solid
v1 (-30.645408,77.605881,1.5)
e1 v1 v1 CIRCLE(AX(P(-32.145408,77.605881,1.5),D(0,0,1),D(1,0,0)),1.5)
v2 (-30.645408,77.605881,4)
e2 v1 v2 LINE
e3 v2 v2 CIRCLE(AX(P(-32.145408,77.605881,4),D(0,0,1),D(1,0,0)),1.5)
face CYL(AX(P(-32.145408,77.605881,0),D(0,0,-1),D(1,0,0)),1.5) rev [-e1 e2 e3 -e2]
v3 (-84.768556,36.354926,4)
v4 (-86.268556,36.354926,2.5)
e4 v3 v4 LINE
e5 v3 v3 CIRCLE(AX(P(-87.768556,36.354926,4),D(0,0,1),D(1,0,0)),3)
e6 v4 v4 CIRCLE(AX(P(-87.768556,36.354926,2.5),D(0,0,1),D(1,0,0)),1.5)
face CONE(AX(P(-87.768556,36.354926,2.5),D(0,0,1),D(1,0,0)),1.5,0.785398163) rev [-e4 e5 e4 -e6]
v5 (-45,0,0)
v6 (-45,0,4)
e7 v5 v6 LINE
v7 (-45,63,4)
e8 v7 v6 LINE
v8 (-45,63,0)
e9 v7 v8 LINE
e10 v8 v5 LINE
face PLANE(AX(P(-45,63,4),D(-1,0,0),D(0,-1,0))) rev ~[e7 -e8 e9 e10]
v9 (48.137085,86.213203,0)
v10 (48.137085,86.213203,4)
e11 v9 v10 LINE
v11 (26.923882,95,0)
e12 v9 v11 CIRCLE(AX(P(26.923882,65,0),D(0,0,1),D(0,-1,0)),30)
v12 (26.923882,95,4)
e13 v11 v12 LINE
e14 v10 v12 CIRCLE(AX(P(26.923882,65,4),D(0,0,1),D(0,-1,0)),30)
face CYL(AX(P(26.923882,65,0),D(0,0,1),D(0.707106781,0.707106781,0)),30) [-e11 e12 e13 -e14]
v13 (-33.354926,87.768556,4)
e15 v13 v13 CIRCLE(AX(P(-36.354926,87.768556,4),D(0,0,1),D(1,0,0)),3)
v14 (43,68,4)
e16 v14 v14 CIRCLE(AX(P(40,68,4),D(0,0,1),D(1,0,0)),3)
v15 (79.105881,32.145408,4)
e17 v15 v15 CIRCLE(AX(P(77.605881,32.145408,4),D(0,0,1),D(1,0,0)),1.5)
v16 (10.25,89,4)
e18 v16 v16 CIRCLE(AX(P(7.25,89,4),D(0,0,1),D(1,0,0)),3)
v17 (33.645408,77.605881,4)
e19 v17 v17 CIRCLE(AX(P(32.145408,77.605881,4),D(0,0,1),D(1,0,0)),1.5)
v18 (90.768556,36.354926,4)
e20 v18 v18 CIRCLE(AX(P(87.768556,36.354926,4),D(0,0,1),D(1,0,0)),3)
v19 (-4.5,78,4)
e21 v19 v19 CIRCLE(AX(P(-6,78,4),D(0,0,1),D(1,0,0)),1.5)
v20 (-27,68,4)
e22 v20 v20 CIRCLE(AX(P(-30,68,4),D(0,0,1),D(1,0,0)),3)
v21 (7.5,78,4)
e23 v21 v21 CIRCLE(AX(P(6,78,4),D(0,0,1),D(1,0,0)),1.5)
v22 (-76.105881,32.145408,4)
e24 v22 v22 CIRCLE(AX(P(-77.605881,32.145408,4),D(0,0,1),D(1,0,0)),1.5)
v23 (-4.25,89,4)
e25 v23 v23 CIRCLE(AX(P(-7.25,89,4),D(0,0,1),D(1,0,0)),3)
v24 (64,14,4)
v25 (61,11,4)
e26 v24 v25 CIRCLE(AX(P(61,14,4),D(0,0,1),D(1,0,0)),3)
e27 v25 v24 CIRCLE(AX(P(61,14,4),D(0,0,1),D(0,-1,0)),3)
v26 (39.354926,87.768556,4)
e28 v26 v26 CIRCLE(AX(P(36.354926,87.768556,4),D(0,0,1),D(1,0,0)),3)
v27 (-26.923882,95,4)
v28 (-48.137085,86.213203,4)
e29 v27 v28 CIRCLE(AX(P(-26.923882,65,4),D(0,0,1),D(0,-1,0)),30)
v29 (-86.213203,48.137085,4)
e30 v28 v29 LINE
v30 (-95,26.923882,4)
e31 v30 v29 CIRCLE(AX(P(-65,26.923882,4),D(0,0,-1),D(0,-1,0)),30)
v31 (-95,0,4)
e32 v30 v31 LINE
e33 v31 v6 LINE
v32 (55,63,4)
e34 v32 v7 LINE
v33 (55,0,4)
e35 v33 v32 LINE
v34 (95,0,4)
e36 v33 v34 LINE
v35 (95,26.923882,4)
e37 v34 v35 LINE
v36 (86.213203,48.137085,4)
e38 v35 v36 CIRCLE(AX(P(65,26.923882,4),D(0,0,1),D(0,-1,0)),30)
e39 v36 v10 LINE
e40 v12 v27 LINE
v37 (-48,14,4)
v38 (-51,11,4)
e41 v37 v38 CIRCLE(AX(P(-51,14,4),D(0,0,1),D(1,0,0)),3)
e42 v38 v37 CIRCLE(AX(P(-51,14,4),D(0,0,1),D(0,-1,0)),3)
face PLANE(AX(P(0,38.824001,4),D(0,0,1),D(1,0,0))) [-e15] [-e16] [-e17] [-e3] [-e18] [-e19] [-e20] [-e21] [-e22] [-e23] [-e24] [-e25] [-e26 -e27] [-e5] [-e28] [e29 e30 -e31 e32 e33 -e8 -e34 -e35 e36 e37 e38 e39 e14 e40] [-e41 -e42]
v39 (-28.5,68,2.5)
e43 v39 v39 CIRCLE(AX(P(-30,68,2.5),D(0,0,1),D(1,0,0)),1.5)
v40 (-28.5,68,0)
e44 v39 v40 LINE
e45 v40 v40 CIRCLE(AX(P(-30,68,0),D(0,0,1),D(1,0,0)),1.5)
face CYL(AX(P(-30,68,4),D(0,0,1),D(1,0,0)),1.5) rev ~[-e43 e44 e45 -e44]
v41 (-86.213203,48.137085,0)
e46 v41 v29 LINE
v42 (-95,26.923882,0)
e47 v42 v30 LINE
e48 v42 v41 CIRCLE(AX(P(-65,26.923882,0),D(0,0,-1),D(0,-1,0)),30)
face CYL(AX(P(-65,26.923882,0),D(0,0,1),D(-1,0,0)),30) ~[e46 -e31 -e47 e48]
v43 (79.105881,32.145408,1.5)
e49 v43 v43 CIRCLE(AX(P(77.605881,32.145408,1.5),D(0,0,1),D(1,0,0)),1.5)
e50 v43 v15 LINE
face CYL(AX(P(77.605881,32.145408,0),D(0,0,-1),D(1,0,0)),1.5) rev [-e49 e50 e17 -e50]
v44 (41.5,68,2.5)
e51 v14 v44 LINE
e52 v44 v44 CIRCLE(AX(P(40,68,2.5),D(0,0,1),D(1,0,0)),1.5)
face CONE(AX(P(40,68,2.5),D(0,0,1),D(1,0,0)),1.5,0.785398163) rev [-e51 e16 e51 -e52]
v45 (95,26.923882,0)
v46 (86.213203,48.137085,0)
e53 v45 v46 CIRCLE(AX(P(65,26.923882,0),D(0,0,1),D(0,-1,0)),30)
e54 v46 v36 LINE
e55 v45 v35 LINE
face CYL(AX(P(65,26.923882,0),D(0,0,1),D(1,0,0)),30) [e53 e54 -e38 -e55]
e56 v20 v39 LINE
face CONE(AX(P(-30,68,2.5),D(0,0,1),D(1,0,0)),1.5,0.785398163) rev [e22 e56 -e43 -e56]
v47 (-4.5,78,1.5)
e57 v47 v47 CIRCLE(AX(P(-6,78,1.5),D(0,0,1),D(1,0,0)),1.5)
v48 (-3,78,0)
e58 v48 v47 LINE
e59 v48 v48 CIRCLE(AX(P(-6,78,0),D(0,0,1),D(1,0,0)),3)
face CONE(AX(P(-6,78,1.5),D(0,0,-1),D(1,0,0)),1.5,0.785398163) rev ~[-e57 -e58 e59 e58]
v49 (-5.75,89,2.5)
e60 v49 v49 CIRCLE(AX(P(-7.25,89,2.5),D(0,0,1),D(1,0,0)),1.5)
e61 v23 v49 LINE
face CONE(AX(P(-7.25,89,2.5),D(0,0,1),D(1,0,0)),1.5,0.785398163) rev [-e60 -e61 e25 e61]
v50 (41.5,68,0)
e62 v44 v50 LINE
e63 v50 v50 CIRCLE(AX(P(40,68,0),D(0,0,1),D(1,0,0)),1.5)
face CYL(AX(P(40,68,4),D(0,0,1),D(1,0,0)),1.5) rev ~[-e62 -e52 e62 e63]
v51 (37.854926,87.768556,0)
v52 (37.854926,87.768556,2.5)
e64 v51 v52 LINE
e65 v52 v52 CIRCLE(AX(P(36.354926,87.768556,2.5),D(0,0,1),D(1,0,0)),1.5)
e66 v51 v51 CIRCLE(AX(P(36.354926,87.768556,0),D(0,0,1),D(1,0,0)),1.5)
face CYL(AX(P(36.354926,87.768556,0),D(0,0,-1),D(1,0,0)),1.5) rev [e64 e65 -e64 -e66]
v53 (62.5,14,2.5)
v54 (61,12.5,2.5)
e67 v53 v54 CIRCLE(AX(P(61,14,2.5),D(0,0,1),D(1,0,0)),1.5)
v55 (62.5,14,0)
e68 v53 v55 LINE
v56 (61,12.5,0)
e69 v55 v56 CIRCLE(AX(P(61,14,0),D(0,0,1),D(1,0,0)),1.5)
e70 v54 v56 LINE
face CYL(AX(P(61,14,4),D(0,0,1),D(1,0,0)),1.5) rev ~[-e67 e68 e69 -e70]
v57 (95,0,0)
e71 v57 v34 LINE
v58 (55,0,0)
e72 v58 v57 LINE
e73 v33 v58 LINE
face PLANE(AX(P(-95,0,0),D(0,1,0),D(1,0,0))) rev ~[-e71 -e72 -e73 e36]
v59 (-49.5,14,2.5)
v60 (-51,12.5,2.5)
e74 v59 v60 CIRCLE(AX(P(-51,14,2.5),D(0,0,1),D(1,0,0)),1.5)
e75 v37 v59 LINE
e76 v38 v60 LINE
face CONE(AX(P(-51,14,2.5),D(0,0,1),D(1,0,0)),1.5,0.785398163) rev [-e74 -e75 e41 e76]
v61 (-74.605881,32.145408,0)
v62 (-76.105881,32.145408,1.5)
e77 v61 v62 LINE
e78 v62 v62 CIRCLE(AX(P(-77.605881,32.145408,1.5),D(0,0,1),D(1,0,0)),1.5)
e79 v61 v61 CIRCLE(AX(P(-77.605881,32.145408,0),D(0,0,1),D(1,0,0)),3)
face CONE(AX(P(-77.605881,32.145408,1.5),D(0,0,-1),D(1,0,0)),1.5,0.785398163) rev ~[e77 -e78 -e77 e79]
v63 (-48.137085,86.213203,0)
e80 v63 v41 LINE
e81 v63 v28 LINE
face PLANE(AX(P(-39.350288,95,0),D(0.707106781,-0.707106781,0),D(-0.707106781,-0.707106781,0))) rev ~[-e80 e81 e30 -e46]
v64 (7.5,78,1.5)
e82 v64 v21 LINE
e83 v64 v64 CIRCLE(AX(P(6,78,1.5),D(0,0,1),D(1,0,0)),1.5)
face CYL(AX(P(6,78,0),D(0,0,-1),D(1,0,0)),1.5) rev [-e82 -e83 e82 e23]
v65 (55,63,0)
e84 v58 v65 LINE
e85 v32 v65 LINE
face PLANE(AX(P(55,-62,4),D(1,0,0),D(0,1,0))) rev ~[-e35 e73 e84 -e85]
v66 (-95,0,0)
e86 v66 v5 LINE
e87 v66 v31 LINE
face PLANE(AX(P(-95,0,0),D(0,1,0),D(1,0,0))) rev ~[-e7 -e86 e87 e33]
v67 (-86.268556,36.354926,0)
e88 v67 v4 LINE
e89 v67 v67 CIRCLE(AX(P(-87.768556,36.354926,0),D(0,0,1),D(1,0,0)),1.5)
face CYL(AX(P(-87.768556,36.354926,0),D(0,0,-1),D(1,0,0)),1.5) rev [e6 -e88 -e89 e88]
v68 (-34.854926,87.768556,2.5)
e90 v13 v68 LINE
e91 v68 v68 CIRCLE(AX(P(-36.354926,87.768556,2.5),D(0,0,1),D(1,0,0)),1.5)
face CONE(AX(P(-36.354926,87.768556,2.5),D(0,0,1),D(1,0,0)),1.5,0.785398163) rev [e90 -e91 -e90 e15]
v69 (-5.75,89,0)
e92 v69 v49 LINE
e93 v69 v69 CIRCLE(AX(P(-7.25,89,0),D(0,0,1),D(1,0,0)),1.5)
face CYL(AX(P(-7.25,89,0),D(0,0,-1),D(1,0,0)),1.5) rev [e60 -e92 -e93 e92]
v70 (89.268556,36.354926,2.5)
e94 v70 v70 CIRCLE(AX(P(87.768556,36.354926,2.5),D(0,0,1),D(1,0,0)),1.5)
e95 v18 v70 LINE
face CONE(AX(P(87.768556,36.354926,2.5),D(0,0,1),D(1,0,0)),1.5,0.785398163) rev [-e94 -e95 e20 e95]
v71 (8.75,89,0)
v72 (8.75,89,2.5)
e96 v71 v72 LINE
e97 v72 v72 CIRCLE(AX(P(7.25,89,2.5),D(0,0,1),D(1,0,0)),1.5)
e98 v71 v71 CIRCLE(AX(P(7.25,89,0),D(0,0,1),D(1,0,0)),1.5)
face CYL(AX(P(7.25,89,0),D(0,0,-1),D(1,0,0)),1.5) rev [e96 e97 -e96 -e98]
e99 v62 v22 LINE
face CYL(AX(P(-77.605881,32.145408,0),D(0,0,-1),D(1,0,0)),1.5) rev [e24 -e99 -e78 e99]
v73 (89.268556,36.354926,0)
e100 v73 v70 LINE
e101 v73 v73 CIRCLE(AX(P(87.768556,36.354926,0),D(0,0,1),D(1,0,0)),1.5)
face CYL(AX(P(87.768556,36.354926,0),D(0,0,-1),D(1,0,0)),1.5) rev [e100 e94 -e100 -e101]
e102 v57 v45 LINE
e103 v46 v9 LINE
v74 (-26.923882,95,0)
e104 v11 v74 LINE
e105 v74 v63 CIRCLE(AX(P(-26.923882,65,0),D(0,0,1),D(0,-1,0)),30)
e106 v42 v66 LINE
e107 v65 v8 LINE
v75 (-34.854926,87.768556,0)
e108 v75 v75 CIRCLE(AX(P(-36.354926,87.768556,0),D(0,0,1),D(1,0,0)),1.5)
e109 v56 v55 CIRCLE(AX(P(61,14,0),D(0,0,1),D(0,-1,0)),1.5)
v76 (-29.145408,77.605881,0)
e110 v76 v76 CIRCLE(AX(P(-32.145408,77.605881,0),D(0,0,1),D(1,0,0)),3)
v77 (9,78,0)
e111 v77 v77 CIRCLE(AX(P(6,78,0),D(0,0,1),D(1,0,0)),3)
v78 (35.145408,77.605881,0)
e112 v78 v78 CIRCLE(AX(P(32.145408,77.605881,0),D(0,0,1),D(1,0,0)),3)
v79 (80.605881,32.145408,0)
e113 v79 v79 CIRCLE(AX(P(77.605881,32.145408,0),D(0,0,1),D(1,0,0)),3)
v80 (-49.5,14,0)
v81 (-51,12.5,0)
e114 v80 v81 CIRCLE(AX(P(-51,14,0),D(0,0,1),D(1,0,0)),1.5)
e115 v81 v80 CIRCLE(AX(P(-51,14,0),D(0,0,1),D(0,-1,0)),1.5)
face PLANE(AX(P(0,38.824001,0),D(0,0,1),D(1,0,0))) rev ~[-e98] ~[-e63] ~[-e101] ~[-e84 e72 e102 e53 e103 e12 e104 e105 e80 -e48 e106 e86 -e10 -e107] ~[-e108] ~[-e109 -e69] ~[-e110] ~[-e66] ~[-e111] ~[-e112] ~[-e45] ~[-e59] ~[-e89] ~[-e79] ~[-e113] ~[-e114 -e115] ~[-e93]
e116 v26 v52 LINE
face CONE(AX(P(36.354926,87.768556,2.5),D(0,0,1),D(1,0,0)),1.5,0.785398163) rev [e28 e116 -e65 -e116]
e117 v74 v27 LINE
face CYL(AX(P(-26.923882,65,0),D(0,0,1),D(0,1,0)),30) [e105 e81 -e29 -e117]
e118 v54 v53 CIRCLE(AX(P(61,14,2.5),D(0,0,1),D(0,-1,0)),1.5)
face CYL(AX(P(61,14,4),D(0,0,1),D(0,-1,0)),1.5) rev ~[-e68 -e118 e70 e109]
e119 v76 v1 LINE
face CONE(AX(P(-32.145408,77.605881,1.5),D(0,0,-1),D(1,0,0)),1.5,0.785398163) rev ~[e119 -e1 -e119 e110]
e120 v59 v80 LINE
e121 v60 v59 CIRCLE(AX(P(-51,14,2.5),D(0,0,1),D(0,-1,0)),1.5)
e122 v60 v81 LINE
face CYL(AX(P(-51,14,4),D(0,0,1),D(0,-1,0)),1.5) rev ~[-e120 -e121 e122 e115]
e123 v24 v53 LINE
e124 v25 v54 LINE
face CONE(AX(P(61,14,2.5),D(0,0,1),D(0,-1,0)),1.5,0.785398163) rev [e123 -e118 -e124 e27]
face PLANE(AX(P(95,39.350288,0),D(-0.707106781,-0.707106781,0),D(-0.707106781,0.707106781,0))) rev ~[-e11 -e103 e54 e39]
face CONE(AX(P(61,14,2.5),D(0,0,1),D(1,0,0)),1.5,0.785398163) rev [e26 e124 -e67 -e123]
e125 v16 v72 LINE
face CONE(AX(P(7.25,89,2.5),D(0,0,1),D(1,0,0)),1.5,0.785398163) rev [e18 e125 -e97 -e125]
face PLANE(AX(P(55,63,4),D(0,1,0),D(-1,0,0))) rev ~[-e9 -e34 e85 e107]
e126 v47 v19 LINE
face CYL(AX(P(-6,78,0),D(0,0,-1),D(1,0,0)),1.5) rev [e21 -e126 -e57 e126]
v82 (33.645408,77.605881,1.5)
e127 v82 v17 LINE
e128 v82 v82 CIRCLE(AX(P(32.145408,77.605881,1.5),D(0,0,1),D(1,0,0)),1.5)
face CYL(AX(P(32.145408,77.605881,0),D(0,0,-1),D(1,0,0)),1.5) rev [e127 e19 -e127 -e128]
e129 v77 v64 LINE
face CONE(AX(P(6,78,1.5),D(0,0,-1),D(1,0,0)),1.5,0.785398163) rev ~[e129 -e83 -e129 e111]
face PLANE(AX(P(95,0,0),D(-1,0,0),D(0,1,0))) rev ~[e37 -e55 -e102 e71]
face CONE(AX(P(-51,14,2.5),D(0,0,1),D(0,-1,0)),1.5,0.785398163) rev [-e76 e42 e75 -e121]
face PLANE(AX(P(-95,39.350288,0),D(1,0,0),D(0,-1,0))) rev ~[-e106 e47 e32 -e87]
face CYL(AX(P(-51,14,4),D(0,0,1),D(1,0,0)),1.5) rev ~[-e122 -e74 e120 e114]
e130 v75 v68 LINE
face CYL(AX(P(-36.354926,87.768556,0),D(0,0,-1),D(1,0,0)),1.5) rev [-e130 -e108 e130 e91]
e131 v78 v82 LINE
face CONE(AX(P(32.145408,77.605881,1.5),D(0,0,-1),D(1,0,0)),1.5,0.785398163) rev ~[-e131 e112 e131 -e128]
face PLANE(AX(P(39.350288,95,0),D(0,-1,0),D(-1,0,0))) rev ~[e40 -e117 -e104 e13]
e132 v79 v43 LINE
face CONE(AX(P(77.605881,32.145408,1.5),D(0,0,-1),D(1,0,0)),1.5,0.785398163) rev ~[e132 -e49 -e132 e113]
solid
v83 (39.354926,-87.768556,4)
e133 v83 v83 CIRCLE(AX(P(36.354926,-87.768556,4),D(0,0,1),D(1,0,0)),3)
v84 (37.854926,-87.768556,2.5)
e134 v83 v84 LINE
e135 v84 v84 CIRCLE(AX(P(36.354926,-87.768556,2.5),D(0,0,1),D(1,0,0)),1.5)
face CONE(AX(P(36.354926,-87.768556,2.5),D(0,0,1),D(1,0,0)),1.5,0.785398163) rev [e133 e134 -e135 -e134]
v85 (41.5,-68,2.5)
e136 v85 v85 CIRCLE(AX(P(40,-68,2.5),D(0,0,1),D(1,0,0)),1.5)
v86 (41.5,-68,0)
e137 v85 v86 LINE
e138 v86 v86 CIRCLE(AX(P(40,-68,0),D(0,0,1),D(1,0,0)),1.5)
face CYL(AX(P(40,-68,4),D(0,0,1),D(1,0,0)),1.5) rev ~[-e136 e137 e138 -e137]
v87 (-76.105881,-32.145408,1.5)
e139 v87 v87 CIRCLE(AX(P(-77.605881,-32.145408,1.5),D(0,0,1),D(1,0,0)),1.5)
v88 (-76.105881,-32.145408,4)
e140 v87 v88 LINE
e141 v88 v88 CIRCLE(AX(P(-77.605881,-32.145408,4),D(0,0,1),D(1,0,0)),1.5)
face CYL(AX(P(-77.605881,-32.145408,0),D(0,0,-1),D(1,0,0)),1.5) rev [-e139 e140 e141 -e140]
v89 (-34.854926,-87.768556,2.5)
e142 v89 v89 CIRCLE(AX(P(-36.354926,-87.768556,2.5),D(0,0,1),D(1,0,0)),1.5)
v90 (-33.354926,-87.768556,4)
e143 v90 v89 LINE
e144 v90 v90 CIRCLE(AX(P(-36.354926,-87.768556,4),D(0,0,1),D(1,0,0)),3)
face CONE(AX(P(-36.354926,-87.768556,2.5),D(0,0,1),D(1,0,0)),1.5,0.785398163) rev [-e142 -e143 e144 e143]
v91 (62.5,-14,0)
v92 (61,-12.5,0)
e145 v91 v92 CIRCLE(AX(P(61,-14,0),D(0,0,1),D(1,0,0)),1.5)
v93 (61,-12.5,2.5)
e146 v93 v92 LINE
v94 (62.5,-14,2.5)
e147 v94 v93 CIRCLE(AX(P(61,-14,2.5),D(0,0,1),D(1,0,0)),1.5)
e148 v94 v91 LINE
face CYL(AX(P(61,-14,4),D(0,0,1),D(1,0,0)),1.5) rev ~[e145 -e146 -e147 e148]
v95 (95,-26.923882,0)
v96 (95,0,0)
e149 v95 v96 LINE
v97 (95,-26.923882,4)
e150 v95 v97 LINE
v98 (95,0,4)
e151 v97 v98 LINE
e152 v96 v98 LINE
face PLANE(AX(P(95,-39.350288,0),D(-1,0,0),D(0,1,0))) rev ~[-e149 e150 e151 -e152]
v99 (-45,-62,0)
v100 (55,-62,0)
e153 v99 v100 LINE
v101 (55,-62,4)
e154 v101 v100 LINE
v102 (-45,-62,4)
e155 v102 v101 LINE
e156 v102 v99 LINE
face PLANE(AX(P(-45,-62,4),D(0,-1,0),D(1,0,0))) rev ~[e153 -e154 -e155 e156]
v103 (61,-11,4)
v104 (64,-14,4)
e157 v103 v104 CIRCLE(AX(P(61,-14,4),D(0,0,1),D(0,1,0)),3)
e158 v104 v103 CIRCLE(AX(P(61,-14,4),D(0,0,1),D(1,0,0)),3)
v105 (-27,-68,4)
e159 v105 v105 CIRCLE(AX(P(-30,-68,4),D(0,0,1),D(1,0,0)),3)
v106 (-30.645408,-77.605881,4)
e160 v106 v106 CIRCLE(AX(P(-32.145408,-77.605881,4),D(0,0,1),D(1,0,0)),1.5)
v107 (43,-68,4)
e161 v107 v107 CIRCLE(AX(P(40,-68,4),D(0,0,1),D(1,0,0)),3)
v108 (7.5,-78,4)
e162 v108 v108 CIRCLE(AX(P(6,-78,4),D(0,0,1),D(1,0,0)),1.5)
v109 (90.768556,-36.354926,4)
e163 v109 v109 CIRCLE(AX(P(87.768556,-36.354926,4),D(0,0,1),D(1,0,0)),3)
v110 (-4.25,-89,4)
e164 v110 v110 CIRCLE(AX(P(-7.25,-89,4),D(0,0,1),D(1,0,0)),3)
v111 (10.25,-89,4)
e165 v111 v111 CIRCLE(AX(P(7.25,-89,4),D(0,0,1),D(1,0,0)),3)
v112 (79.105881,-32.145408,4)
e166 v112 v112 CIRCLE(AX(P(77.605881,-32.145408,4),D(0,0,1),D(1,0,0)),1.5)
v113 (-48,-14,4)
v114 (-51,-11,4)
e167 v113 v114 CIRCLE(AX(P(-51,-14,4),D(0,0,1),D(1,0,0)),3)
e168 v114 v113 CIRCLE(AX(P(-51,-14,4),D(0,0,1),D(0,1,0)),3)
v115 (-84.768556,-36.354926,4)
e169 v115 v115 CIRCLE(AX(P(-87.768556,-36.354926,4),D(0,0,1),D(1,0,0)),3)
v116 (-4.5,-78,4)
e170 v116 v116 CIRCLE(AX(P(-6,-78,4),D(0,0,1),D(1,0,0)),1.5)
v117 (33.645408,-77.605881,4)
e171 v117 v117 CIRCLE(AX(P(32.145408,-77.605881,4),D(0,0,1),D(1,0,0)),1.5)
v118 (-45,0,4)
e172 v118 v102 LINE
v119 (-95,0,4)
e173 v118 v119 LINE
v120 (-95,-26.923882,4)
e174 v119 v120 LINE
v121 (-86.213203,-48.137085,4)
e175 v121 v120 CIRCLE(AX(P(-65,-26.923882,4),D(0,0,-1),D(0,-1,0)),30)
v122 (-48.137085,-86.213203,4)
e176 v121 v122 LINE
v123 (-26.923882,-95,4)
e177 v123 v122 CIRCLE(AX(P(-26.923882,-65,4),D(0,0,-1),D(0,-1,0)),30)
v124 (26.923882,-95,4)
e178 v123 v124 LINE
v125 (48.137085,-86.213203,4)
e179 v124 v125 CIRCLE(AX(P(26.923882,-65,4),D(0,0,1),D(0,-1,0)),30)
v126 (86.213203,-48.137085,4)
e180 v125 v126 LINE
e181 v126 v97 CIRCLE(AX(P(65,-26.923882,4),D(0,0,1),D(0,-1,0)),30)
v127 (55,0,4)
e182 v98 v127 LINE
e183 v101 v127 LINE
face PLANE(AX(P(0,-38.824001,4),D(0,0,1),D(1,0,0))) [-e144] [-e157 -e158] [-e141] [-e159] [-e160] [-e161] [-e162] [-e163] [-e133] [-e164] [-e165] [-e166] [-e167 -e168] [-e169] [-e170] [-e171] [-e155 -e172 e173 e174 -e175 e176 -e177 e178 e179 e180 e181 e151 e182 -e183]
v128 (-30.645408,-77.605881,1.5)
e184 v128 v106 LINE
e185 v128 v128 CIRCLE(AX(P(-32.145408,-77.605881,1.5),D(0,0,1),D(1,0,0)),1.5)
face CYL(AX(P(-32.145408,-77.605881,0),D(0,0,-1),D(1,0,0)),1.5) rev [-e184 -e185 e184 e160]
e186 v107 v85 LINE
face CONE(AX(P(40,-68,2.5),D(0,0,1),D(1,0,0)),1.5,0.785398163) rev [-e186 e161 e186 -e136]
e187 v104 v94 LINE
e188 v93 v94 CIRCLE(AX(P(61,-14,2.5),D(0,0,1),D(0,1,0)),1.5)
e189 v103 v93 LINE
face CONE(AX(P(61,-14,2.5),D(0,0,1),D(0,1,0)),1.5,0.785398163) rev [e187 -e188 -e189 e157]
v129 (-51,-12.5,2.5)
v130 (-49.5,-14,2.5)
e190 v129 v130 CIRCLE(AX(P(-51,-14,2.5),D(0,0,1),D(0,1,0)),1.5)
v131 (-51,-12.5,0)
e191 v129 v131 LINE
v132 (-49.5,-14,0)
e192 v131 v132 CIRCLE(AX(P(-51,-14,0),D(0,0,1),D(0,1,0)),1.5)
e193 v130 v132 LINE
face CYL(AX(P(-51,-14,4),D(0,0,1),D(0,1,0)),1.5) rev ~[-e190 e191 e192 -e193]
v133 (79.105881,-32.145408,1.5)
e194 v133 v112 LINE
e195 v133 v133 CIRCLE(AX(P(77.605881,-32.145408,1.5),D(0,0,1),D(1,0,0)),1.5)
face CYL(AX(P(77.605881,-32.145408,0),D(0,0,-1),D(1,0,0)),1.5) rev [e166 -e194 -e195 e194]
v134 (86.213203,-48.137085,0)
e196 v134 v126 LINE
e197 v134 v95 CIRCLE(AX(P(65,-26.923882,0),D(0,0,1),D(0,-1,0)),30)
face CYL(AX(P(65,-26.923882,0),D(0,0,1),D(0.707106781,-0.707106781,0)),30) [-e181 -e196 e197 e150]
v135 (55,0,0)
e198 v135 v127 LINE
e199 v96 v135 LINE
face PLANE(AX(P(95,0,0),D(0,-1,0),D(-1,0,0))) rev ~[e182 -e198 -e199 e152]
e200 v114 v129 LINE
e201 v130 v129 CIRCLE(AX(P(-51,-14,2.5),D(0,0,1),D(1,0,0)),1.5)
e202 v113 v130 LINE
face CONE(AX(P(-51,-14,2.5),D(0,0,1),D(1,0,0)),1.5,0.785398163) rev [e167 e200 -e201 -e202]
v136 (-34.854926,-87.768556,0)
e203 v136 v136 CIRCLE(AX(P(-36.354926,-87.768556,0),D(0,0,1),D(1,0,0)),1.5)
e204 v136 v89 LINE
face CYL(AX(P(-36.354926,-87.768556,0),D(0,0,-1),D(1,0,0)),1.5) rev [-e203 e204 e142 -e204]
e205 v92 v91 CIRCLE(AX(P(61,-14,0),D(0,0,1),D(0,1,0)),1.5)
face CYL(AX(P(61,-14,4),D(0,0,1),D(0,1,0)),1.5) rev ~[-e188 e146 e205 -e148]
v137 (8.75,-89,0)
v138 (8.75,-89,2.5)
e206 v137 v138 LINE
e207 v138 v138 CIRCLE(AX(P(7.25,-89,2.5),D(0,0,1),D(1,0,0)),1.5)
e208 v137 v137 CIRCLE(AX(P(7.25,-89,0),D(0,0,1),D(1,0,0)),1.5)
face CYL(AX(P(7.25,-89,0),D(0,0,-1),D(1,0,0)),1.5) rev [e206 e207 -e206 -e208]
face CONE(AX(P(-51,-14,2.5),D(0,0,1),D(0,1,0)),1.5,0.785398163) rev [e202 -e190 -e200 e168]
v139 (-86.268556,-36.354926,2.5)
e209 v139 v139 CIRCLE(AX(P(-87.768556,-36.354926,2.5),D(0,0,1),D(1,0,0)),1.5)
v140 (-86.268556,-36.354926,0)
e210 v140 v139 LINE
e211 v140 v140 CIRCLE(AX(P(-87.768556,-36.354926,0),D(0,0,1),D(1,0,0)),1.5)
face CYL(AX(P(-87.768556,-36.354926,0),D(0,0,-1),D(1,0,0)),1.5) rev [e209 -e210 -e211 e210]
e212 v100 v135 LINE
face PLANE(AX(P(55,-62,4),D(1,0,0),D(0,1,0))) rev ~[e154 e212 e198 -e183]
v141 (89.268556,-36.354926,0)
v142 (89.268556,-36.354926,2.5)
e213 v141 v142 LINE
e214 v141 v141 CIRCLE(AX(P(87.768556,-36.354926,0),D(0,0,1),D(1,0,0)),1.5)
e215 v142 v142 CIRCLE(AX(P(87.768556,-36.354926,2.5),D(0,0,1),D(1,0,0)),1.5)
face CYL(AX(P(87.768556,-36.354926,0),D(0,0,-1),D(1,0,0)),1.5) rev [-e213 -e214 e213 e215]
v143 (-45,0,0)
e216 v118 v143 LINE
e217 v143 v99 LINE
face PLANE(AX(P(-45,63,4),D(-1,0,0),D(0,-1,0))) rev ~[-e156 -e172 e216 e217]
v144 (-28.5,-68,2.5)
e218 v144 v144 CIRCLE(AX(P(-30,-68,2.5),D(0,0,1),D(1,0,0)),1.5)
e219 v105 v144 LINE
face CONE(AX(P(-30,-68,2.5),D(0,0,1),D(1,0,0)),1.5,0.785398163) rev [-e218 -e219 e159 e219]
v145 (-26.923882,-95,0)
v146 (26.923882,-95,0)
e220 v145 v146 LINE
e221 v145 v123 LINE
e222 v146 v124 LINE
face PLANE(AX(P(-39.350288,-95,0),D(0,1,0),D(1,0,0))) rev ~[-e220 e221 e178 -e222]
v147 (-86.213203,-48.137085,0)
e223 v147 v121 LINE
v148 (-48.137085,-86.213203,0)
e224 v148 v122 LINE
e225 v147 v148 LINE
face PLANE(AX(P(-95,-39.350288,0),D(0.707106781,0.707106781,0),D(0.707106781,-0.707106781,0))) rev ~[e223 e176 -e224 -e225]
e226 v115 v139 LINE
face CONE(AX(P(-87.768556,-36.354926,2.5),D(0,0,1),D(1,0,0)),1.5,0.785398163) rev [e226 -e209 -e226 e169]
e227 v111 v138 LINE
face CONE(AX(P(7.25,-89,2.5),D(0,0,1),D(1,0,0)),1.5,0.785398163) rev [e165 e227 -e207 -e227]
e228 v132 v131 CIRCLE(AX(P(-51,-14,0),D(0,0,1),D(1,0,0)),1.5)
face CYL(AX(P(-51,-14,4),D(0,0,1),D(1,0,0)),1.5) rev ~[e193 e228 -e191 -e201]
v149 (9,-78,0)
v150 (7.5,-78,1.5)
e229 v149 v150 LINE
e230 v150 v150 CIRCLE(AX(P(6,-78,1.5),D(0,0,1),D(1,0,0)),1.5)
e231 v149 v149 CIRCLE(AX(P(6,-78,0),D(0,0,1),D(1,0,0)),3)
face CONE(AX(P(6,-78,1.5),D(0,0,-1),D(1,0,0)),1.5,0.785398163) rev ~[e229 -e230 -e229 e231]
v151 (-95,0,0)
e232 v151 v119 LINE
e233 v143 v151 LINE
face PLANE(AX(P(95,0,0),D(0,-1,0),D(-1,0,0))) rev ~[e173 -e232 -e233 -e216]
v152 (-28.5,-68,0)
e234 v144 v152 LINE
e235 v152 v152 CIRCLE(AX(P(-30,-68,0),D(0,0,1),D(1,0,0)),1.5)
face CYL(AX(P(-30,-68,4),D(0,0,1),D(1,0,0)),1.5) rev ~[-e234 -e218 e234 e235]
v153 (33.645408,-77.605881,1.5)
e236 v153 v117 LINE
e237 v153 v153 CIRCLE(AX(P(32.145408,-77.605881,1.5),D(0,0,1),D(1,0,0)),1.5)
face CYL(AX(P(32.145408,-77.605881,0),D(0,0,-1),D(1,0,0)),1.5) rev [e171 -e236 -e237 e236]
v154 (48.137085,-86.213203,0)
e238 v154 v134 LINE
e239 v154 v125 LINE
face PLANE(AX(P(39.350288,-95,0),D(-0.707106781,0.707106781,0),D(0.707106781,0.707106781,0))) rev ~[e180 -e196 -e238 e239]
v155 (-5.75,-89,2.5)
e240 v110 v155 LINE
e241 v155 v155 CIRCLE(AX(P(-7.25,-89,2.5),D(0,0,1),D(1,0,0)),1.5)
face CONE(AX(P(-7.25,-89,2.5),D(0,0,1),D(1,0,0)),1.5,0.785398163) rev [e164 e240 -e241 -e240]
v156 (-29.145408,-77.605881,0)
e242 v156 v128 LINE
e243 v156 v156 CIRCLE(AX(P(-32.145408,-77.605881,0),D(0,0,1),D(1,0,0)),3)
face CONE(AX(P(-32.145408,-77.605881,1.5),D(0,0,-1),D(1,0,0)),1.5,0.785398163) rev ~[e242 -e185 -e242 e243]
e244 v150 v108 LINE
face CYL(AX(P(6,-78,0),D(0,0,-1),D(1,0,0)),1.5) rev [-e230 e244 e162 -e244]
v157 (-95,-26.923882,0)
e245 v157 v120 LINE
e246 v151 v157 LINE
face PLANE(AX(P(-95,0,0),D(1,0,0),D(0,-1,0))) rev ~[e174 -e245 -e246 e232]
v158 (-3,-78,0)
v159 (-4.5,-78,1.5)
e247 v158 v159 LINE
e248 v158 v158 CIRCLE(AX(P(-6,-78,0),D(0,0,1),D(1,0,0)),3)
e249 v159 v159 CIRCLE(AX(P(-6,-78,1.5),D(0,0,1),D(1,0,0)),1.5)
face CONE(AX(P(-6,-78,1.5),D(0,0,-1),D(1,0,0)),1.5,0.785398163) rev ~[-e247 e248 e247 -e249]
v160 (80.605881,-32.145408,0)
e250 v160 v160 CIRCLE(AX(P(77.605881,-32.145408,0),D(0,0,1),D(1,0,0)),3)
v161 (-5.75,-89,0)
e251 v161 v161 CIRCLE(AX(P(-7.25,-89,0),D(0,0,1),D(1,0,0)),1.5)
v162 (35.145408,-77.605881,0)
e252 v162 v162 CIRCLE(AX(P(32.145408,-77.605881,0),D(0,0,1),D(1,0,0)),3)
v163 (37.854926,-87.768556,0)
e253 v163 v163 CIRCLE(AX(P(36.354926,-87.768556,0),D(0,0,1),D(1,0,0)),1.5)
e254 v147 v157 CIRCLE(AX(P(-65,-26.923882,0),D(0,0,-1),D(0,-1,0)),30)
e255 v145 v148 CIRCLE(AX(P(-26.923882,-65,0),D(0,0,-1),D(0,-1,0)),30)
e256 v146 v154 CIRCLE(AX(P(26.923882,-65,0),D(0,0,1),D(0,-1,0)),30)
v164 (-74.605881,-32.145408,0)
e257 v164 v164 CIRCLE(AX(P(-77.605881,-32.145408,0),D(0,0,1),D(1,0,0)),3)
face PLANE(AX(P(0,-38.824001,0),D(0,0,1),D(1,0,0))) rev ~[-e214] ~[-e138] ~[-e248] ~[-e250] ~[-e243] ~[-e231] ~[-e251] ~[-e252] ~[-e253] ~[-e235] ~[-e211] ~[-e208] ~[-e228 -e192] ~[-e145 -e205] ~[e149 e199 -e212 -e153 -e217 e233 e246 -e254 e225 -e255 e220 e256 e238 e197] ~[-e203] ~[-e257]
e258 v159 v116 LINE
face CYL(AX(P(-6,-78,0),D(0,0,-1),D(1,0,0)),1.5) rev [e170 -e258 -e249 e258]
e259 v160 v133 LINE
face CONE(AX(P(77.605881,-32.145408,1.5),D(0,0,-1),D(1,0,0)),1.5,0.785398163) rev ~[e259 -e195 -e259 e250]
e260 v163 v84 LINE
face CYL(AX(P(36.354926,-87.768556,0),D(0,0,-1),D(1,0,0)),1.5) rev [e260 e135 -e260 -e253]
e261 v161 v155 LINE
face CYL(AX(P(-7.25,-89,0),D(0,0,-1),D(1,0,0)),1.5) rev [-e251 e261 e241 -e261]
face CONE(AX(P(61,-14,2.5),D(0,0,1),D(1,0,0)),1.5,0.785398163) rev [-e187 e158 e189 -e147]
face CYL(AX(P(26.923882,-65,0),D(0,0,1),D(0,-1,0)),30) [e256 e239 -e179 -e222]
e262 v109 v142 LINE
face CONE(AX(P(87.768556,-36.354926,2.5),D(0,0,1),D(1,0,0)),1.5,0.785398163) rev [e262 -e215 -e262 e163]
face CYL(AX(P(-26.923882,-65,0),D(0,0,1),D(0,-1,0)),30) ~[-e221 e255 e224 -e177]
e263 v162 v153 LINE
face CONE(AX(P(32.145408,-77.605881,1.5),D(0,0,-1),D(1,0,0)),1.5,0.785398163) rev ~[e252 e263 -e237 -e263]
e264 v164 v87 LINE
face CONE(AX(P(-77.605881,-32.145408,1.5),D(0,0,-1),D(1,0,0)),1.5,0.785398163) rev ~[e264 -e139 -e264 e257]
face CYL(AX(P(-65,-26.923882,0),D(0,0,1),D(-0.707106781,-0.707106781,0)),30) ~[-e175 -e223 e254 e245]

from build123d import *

# Parameters (mm, degrees)
F0_R      = 1.5
F1_DEPTH  = 4
F2_DEPTH  = 4
F3_R      = 30
F3_2_R    = 30
F4_R      = 1.5
F5_DEPTH  = 25
F7_DEPTH  = 25
F8_SIZE   = 1.5
F8_2_SIZE = 1.5


# Not quite as in the source:
# - a feature names something its author has since deleted; it is built from what else it names


with BuildPart() as f1:
    # F0 (on Top) → F1 (new body)
    with BuildSketch(Plane.XY):
        Polygon((0, 0), (95, 0), (95, 39.3502884254), (39.3502884254, 95), (-39.3502884254, 95), (-95, 39.3502884254), (-95, 0), align=None)
        with Locations((-77.6058807309, 32.1454083187)):
            Circle(F0_R, mode=Mode.SUBTRACT)
        with Locations((-87.7685555886, 36.3549260747)):
            Circle(F0_R, mode=Mode.SUBTRACT)
        with Locations((-32.1454083187, 77.6058807309)):
            Circle(F0_R, mode=Mode.SUBTRACT)
        with Locations((-36.3549260747, 87.7685555886)):
            Circle(F0_R, mode=Mode.SUBTRACT)
        with Locations((-6, 78)):
            Circle(F0_R, mode=Mode.SUBTRACT)
        with Locations((-7.25, 89)):
            Circle(F0_R, mode=Mode.SUBTRACT)
        with Locations((77.6058807309, 32.1454083187)):
            Circle(F0_R, mode=Mode.SUBTRACT)
        with Locations((87.7685555886, 36.3549260747)):
            Circle(F0_R, mode=Mode.SUBTRACT)
        with Locations((6, 78)):
            Circle(F0_R, mode=Mode.SUBTRACT)
        with Locations((7.25, 89)):
            Circle(F0_R, mode=Mode.SUBTRACT)
        with Locations((32.1454083187, 77.6058807309)):
            Circle(F0_R, mode=Mode.SUBTRACT)
        with Locations((36.3549260747, 87.7685555886)):
            Circle(F0_R, mode=Mode.SUBTRACT)
    extrude(amount=F1_DEPTH)

    # F3
    f3_edges = [f1.edges().sort_by_distance(p)[0] for p in [
        (95, 39.350288, 2),
        (39.350288, 95, 2),
        (-39.350288, 95, 2),
        (-95, 39.350288, 2),
    ]]
    fillet(f3_edges, radius=F3_R)


with BuildPart() as f2:
    # F0 (on Top) → F2 (new body)
    with BuildSketch(Plane.XY):
        Polygon((-39.3502884254, -95), (39.3502884254, -95), (95, -39.3502884254), (95, 0), (0, 0), (-95, 0), (-95, -39.3502884254), align=None)
        with Locations((-36.3549260747, -87.7685555886)):
            Circle(F0_R, mode=Mode.SUBTRACT)
        with Locations((-32.1454083187, -77.6058807309)):
            Circle(F0_R, mode=Mode.SUBTRACT)
        with Locations((-7.25, -89)):
            Circle(F0_R, mode=Mode.SUBTRACT)
        with Locations((-6, -78)):
            Circle(F0_R, mode=Mode.SUBTRACT)
        with Locations((-87.7685555886, -36.3549260747)):
            Circle(F0_R, mode=Mode.SUBTRACT)
        with Locations((-77.6058807309, -32.1454083187)):
            Circle(F0_R, mode=Mode.SUBTRACT)
        with Locations((7.25, -89)):
            Circle(F0_R, mode=Mode.SUBTRACT)
        with Locations((6, -78)):
            Circle(F0_R, mode=Mode.SUBTRACT)
        with Locations((36.3549260747, -87.7685555886)):
            Circle(F0_R, mode=Mode.SUBTRACT)
        with Locations((32.1454083187, -77.6058807309)):
            Circle(F0_R, mode=Mode.SUBTRACT)
        with Locations((87.7685555886, -36.3549260747)):
            Circle(F0_R, mode=Mode.SUBTRACT)
        with Locations((77.6058807309, -32.1454083187)):
            Circle(F0_R, mode=Mode.SUBTRACT)
    extrude(amount=F2_DEPTH)

    # F3#2
    f3_2_edges = [f2.edges().sort_by_distance(p)[0] for p in [
        (-95, -39.350288, 2),
        (95, -39.350288, 2),
        (-39.350288, -95, 2),
        (39.350288, -95, 2),
    ]]
    fillet(f3_2_edges, radius=F3_2_R)


with BuildPart() as f5_tool:
    # F4 (on face) → F5 (new body)
    with BuildSketch(Plane.XY.offset(4)):
        with Locations((-30, 68)):
            Circle(F4_R)
        with Locations((40, 68)):
            Circle(F4_R)
        with Locations((40, -68)):
            Circle(F4_R)
        with Locations((-30, -68)):
            Circle(F4_R)
    extrude(amount=-F5_DEPTH)


with BuildPart() as f1_1:
    add(f1.part)

    # F5: cut by f5_tool
    add(f5_tool.part, mode=Mode.SUBTRACT)


with BuildPart() as f2_1:
    add(f2.part)

    # F5: cut by f5_tool
    add(f5_tool.part, mode=Mode.SUBTRACT)


with BuildPart() as f7_tool:
    # F6 (on face) → F7 (new body)
    with BuildSketch(Plane.XY.offset(4)):
        with BuildLine():
            ThreePointArc((62.5, 14), (59.9393398282, 15.0606601718), (61, 12.5))
            ThreePointArc((61, 12.5), (62.0606601718, 12.9393398282), (62.5, 14))
        make_face()
        with BuildLine():
            ThreePointArc((-49.5, 14), (-52.0606601718, 15.0606601718), (-51, 12.5))
            ThreePointArc((-51, 12.5), (-49.9393398282, 12.9393398282), (-49.5, 14))
        make_face()
        Polygon((5, 63), (-45, 63), (-45, 0), (0, 0), (55, 0), (55, 63), align=None)
        Polygon((0, 0), (-45, 0), (-45, -62), (55, -62), (55, 0), align=None)
        with BuildLine():
            ThreePointArc((-49.5, -14), (-49.9393398282, -12.9393398282), (-51, -12.5))
            ThreePointArc((-51, -12.5), (-52.0606601718, -15.0606601718), (-49.5, -14))
        make_face()
        with BuildLine():
            ThreePointArc((62.5, -14), (62.0606601718, -12.9393398282), (61, -12.5))
            ThreePointArc((61, -12.5), (59.9393398282, -15.0606601718), (62.5, -14))
        make_face()
    extrude(amount=-F7_DEPTH)


with BuildPart() as f1_2:
    add(f1_1.part)

    # F7: cut by f7_tool
    add(f7_tool.part, mode=Mode.SUBTRACT)

    # F8
    f8_edges = [f1_2.edges().sort_by_distance(p)[0] for p in [
        (-31.5, 68, 4),
        (38.5, 68, 4),
        (-89.268556, 36.354926, 4),
        (-37.854926, 87.768556, 4),
        (-8.75, 89, 4),
        (5.75, 89, 4),
        (34.854926, 87.768556, 4),
        (86.268556, 36.354926, 4),
        (-79.105881, 32.145408, 0),
        (76.105881, 32.145408, 0),
        (30.645408, 77.605881, 0),
        (4.5, 78, 0),
        (-7.5, 78, 0),
        (-33.645408, 77.605881, 0),
        (-52.5, 14, 4),
        (59.5, 14, 4),
    ]]
    chamfer(f8_edges, length=F8_SIZE)


with BuildPart() as f2_2:
    add(f2_1.part)

    # F7: cut by f7_tool
    add(f7_tool.part, mode=Mode.SUBTRACT)

    # F8#2
    f8_2_edges = [f2_2.edges().sort_by_distance(p)[0] for p in [
        (-31.5, -68, 4),
        (38.5, -68, 4),
        (34.854926, -87.768556, 4),
        (5.75, -89, 4),
        (-8.75, -89, 4),
        (-37.854926, -87.768556, 4),
        (-89.268556, -36.354926, 4),
        (86.268556, -36.354926, 4),
        (-79.105881, -32.145408, 0),
        (-33.645408, -77.605881, 0),
        (-7.5, -78, 0),
        (4.5, -78, 0),
        (30.645408, -77.605881, 0),
        (76.105881, -32.145408, 0),
        (-52.5, -14, 4),
        (59.5, -14, 4),
    ]]
    chamfer(f8_2_edges, length=F8_2_SIZE)


solid = Compound([f1_2.part, f2_2.part])
